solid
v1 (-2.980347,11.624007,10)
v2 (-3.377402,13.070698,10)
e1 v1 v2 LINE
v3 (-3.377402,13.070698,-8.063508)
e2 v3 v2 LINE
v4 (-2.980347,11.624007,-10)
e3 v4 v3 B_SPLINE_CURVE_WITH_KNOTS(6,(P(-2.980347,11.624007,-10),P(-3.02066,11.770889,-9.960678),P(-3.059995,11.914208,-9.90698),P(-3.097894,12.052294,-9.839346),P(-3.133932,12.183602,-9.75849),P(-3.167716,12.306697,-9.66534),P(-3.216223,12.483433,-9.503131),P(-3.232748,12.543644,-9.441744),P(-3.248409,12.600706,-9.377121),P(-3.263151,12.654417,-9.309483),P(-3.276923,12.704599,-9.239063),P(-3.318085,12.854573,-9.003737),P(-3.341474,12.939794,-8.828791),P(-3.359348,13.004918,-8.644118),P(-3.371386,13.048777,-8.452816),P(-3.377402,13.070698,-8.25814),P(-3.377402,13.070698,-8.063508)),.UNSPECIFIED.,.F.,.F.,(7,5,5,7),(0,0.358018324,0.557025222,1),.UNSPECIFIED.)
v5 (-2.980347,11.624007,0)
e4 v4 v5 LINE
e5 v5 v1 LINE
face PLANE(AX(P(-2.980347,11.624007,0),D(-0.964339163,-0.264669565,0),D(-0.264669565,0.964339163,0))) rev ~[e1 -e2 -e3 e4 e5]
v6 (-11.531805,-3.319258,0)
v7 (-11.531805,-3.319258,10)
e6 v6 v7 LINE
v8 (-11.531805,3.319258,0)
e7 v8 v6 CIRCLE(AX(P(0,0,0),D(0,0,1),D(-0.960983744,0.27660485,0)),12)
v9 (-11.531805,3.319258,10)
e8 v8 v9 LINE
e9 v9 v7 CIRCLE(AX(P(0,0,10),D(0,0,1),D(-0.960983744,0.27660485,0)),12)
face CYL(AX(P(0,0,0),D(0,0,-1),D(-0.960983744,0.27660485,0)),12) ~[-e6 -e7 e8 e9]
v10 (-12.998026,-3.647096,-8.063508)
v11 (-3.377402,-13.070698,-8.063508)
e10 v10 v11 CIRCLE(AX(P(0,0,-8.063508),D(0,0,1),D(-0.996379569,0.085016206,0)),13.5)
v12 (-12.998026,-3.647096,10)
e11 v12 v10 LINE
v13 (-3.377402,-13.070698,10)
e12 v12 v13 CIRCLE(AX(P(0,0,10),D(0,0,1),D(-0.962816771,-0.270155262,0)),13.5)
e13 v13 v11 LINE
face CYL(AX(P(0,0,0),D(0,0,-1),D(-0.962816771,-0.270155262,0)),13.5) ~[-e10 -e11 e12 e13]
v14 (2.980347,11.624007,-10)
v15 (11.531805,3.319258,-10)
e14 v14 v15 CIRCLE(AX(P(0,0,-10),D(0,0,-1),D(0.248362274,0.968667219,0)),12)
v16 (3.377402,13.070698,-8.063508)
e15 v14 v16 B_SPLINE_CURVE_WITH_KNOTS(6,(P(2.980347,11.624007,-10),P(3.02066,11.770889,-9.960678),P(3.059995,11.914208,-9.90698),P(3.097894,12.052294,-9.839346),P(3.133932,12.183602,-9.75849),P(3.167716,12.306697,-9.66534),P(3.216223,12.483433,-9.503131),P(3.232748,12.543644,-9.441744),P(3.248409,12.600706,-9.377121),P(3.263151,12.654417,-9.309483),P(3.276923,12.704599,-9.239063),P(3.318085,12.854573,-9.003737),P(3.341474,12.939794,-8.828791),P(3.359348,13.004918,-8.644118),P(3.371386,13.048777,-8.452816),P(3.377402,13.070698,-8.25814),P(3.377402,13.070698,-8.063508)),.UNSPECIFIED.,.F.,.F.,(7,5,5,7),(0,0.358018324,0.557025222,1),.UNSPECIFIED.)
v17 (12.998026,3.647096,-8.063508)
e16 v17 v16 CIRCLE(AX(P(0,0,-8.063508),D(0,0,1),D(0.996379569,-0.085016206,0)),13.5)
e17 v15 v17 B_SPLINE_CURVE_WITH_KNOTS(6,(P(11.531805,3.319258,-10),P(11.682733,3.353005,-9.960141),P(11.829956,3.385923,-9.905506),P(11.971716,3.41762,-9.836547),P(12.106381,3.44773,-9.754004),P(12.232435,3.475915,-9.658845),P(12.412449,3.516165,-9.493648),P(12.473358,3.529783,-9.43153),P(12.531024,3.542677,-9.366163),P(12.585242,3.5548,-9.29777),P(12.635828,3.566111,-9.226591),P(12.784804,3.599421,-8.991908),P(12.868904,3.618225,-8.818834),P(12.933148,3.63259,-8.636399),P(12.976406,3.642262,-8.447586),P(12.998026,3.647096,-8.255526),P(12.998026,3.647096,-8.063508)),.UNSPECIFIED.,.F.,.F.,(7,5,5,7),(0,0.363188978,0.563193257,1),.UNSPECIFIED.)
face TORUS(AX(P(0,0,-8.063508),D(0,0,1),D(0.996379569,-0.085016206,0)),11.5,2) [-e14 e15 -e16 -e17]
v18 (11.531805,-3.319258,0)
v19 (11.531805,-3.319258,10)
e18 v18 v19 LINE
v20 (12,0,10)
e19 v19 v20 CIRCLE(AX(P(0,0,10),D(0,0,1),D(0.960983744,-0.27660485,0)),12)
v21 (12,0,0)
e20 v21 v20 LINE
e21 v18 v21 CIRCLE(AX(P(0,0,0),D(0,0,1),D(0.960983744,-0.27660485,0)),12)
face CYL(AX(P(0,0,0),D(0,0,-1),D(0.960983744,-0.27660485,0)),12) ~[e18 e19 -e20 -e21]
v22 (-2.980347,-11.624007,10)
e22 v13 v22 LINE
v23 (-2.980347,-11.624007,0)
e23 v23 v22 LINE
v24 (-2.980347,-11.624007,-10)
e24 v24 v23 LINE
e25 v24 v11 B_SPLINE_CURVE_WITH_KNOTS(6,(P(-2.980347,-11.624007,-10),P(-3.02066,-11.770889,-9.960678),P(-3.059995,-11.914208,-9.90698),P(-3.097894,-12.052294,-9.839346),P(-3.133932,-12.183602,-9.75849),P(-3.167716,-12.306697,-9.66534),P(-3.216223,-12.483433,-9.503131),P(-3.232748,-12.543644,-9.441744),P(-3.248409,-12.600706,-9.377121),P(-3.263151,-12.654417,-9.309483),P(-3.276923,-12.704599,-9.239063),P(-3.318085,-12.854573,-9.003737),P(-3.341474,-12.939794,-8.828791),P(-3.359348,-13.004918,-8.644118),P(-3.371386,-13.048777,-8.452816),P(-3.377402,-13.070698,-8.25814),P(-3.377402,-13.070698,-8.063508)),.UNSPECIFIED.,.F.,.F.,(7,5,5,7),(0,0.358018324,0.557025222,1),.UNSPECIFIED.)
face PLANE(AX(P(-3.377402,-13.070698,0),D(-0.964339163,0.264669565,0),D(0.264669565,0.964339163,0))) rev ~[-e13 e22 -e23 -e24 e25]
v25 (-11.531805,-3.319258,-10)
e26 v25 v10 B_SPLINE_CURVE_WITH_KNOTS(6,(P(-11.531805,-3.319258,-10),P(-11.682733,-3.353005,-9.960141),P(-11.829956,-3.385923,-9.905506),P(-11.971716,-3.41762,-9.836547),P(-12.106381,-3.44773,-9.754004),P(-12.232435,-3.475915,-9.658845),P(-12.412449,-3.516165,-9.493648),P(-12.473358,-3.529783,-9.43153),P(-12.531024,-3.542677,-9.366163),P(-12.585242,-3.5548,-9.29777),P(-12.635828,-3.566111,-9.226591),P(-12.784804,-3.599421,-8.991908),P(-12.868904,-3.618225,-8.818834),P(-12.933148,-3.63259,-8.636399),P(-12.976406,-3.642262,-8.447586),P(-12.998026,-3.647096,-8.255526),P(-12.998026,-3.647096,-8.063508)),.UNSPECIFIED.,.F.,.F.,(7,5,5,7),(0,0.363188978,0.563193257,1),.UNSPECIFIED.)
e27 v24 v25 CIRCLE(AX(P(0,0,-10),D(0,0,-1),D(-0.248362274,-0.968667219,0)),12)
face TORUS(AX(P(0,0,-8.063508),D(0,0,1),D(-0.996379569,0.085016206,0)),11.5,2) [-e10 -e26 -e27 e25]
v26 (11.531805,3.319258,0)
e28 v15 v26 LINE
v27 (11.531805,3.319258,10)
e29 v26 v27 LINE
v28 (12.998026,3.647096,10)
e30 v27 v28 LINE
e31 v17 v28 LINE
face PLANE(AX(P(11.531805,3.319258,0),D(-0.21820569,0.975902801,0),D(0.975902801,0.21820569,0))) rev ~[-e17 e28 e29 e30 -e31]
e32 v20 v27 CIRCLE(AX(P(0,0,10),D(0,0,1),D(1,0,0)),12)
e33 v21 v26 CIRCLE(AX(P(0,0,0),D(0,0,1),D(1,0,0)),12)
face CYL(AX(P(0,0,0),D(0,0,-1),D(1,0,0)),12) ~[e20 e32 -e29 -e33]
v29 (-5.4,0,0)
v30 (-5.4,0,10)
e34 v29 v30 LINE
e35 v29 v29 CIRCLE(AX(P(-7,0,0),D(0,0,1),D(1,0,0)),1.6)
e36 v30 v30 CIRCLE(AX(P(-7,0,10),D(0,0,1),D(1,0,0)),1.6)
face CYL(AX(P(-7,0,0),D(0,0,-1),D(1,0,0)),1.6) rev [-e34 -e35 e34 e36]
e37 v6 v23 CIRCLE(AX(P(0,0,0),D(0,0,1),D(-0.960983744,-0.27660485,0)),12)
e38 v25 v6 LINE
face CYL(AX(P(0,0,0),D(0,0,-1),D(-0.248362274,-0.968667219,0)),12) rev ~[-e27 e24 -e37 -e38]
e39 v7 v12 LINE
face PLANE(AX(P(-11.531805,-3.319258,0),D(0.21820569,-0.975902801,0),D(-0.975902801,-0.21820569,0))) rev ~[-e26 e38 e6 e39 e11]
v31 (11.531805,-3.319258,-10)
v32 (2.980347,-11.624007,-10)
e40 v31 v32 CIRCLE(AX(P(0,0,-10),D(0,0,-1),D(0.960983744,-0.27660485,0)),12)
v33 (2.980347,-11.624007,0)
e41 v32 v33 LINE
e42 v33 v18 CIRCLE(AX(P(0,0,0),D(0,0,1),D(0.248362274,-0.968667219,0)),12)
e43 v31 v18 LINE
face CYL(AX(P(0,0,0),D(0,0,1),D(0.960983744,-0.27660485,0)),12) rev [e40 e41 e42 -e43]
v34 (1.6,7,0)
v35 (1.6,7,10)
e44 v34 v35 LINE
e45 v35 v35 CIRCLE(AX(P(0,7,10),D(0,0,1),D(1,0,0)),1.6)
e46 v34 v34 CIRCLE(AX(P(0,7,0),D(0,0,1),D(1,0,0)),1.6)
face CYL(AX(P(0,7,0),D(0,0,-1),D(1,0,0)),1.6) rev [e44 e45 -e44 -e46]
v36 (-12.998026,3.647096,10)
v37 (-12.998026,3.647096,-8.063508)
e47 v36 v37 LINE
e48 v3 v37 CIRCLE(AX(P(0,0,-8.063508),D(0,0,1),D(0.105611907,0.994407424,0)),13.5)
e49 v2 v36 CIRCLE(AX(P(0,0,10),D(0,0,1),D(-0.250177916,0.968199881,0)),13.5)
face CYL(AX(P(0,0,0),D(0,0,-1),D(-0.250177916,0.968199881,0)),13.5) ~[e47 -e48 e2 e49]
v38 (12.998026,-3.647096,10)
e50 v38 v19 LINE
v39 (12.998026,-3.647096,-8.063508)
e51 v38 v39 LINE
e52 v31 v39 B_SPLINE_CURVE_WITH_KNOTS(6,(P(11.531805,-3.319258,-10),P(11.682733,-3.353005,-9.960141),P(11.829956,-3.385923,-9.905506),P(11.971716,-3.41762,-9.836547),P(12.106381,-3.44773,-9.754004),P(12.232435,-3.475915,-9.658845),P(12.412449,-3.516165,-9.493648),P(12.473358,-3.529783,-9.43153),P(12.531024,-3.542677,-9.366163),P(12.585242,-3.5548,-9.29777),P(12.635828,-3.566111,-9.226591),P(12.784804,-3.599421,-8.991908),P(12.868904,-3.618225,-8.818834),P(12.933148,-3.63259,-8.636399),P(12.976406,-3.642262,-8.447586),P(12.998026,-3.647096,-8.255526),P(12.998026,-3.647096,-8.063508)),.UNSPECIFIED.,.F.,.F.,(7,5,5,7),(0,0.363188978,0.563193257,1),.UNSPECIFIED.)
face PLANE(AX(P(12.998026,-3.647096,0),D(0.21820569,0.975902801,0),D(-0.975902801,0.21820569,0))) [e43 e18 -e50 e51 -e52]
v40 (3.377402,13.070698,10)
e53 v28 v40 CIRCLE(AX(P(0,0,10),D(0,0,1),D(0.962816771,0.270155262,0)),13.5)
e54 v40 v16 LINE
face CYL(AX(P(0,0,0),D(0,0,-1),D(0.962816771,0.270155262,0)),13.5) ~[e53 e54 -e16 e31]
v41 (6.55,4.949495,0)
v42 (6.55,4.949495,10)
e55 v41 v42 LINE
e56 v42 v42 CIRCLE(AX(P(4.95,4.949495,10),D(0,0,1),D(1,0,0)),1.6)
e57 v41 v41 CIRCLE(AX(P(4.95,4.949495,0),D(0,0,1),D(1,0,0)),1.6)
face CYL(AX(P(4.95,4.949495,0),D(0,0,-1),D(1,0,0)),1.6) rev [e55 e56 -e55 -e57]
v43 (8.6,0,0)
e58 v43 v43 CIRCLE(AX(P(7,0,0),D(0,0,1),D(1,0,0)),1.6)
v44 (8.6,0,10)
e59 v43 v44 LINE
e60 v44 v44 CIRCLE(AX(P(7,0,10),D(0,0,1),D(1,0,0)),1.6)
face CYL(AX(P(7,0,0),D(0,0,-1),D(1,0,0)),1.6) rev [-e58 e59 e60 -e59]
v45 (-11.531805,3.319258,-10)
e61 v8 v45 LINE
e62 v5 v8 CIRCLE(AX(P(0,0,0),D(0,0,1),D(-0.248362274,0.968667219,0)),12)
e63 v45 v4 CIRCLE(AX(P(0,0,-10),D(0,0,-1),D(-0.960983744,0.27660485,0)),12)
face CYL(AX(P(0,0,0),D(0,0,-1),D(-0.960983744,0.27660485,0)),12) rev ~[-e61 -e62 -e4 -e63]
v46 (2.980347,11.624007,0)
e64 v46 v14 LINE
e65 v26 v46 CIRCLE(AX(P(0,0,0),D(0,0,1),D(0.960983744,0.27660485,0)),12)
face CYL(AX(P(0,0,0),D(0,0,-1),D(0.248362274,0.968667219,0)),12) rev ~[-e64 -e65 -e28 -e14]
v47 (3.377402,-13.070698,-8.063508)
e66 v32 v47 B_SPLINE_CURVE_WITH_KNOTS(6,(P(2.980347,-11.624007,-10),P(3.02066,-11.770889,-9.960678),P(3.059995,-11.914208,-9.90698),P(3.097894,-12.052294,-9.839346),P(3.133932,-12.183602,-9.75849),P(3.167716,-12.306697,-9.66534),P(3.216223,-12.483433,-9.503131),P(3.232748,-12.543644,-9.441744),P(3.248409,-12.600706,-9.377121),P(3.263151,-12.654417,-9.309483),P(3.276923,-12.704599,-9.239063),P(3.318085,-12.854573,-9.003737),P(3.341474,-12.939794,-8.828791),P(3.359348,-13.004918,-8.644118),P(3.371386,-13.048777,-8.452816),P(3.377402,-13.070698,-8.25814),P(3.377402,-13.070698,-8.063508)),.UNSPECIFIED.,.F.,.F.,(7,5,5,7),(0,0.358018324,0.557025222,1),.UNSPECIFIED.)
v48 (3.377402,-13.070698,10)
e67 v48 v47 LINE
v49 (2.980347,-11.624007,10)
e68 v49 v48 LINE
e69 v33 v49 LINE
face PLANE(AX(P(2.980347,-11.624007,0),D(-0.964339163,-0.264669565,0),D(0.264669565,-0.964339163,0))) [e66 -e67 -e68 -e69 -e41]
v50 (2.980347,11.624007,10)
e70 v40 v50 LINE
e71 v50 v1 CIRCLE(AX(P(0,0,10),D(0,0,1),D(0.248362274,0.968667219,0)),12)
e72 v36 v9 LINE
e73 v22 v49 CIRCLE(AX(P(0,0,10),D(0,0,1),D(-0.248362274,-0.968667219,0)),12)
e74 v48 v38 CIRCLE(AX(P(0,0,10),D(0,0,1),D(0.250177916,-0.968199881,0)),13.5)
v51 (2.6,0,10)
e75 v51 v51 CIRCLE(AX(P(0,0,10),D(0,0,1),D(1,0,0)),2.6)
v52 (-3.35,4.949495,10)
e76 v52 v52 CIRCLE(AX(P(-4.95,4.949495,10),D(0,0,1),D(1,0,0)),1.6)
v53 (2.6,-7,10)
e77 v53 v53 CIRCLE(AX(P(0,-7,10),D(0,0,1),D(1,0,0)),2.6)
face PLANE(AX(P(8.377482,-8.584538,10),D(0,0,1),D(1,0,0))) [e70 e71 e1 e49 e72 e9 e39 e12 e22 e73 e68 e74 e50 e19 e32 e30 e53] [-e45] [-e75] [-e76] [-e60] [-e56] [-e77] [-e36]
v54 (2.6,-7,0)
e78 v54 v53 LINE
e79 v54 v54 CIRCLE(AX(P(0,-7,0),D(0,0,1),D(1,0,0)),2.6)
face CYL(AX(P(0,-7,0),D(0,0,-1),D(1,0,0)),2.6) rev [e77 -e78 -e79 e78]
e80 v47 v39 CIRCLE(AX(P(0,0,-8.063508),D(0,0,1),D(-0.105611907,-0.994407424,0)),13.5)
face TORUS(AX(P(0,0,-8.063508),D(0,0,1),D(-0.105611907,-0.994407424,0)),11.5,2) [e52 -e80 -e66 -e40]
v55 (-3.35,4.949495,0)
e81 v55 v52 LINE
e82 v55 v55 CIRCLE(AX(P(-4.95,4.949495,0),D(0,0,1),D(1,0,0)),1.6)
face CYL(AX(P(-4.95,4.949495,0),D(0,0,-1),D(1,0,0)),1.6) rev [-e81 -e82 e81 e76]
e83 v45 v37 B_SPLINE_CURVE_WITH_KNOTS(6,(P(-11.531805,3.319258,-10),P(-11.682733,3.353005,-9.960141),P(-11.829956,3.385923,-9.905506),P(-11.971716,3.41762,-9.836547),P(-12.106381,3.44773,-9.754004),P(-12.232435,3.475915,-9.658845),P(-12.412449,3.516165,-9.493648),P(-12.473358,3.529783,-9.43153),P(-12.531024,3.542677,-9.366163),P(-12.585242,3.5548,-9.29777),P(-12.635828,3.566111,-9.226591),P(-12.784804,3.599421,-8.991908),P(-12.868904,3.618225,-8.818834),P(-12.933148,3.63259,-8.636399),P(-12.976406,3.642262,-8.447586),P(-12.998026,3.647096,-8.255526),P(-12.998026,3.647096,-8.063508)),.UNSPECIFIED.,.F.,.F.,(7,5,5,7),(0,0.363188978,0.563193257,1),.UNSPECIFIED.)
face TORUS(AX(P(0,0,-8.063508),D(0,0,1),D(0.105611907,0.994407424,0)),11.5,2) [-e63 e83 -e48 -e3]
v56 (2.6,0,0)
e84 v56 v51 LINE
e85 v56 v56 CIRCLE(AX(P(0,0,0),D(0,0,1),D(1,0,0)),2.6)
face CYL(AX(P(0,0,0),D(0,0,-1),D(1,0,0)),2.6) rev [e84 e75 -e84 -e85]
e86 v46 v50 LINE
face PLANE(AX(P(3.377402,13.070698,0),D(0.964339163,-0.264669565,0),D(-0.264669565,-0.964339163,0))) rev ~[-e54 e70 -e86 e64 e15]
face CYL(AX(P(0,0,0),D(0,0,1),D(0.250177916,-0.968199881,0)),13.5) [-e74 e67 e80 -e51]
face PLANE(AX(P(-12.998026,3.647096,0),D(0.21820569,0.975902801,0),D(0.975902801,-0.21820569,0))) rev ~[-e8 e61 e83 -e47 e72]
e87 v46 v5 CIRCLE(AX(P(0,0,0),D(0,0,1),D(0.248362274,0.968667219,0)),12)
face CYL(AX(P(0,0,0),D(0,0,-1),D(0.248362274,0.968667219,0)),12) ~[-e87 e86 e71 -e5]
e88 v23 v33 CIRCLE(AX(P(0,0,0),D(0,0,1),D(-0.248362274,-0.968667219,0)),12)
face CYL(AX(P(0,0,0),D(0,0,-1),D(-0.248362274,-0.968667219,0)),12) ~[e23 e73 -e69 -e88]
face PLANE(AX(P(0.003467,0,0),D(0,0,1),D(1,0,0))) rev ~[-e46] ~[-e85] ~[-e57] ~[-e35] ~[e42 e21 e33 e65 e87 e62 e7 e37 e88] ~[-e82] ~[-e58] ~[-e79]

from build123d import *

# Parameters (mm, degrees)
F0_R        = 4.25
F0_R_2      = 2.6
F1_DEPTH    = 10
F0_R_3      = 10.25
F0_R_4      = 1.6
F2_DEPTH    = 10
F3_DEPTH    = 10
F4_DEPTH    = 10
F5_T2_ANGLE = 100.939379093
F5_T4_ANGLE = 100.939379093
F5_T6_ANGLE = 100.939379093
F5_T8_ANGLE = 100.939379093


# Not quite as in the source:
# - a fillet or chamfer that OpenCascade refuses, or shapes differently, is made with other operations: its cross-section is extruded or revolved along the edge and cut away or added


with BuildPart() as f1:
    # F0 (on Top) → F1 (new body)
    with BuildSketch(Plane.XY):
        Circle(F0_R)
        Circle(F0_R_2, mode=Mode.SUBTRACT)
    extrude(amount=F1_DEPTH)

    # F0 (on Top) → F2 (join)
    with BuildSketch(Plane.XY):
        Circle(F0_R_3)
        with Locations((0, -7)):
            Circle(F0_R_2, mode=Mode.SUBTRACT)
        with Locations((-7, 0)):
            Circle(F0_R_4, mode=Mode.SUBTRACT)
        with Locations((-4.95, 4.9494949237)):
            Circle(F0_R_4, mode=Mode.SUBTRACT)
        Circle(F0_R, mode=Mode.SUBTRACT)
        with Locations((4.95, 4.9494949237)):
            Circle(F0_R_4, mode=Mode.SUBTRACT)
        with Locations((7, 0)):
            Circle(F0_R_4, mode=Mode.SUBTRACT)
        with Locations((0, 7)):
            Circle(F0_R_4, mode=Mode.SUBTRACT)
    extrude(amount=F2_DEPTH)

    # F0 (on Top) → F3 (join)
    with BuildSketch(Plane.XY):
        with BuildLine():
            ThreePointArc((11.5318049333, -3.3192581973), (11.8823747458, -1.6760579943), (12, 0))
            ThreePointArc((12, 0), (11.8823747458, 1.6760579943), (11.5318049333, 3.3192581973))
            ThreePointArc((11.5318049333, 3.3192581973), (8.3601945025, 8.6085508583), (2.9803472847, 11.6240066269))
            ThreePointArc((2.9803472847, 11.6240066269), (0, 12), (-2.9803472847, 11.6240066269))
            ThreePointArc((-2.9803472847, 11.6240066269), (-8.3601945025, 8.6085508583), (-11.5318049333, 3.3192581973))
            ThreePointArc((-11.5318049333, 3.3192581973), (-12, 0), (-11.5318049333, -3.3192581973))
            ThreePointArc((-11.5318049333, -3.3192581973), (-8.3601945025, -8.6085508583), (-2.9803472847, -11.6240066269))
            ThreePointArc((-2.9803472847, -11.6240066269), (0, -12), (2.9803472847, -11.6240066269))
            ThreePointArc((2.9803472847, -11.6240066269), (8.3601945025, -8.6085508583), (11.5318049333, -3.3192581973))
        make_face()
        Circle(F0_R_3, mode=Mode.SUBTRACT)
    extrude(amount=F3_DEPTH)

    # F0 (on Top) → F4 (join, symmetric)
    with BuildSketch(Plane.XY):
        with BuildLine():
            ThreePointArc((2.9803472847, 11.6240066269), (8.3601945025, 8.6085508583), (11.5318049333, 3.3192581973))
            Line((11.5318049333, 3.3192581973), (12.9980264072, 3.6470960391))
            ThreePointArc((12.9980264072, 3.6470960391), (9.4466784184, 9.6441830582), (3.3774018659, 13.070698399))
            Line((3.3774018659, 13.070698399), (2.9803472847, 11.6240066269))
        make_face()
        with BuildLine():
            ThreePointArc((-11.5318049333, 3.3192581973), (-8.3601945025, 8.6085508583), (-2.9803472847, 11.6240066269))
            Line((-2.9803472847, 11.6240066269), (-3.3774018659, 13.070698399))
            ThreePointArc((-3.3774018659, 13.070698399), (-9.4466784184, 9.6441830582), (-12.9980264072, 3.6470960391))
            Line((-12.9980264072, 3.6470960391), (-11.5318049333, 3.3192581973))
        make_face()
        with BuildLine():
            Line((-3.3774018659, -13.070698399), (-2.9803472847, -11.6240066269))
            ThreePointArc((-2.9803472847, -11.6240066269), (-8.3601945025, -8.6085508583), (-11.5318049333, -3.3192581973))
            Line((-11.5318049333, -3.3192581973), (-12.9980264072, -3.6470960391))
            ThreePointArc((-12.9980264072, -3.6470960391), (-9.4466784184, -9.6441830582), (-3.3774018659, -13.070698399))
        make_face()
        with BuildLine():
            Line((12.9980264072, -3.6470960391), (11.5318049333, -3.3192581973))
            ThreePointArc((11.5318049333, -3.3192581973), (8.3601945025, -8.6085508583), (2.9803472847, -11.6240066269))
            Line((2.9803472847, -11.6240066269), (3.3774018659, -13.070698399))
            ThreePointArc((3.3774018659, -13.070698399), (9.4466784184, -9.6441830582), (12.9980264072, -3.6470960391))
        make_face()
    extrude(amount=F4_DEPTH, both=True)

    # F5: fillet of radius 2 on 4 edges, made by hand

    # F5_s1 → F5_t2 (revolve, cut)
    with BuildSketch(Plane(origin=(0, 0, 0), x_dir=(0, 0, 1), z_dir=(-0.0850162065, -0.9963795686, 0))):
        with BuildLine():
            ThreePointArc((-10, -12), (-9.2882531983, -13.0811388301), (-8.0635083269, -13.5))
            Line((-8.0635083269, -13.5), (-10, -13.5))
            Line((-10, -13.5), (-10, -12))
        make_face()
    revolve(axis=Axis((0, 0, -10), (0, 0, 1)), revolution_arc=F5_T2_ANGLE, mode=Mode.SUBTRACT)

    # F5_s3 → F5_t4 (revolve, cut)
    with BuildSketch(Plane(origin=(0, 0, 0), x_dir=(0, 0, 1), z_dir=(0.9944074241, -0.1056119072, 0))):
        with BuildLine():
            ThreePointArc((-10, -12), (-9.2882531983, -13.0811388301), (-8.0635083269, -13.5))
            Line((-8.0635083269, -13.5), (-10, -13.5))
            Line((-10, -13.5), (-10, -12))
        make_face()
    revolve(axis=Axis((0, 0, -10), (0, 0, 1)), revolution_arc=F5_T4_ANGLE, mode=Mode.SUBTRACT)

    # F5_s5 → F5_t6 (revolve, cut)
    with BuildSketch(Plane(origin=(0, 0, 0), x_dir=(0, 0, 1), z_dir=(0.0850162065, 0.9963795686, 0))):
        with BuildLine():
            ThreePointArc((-10, -12), (-9.2882531983, -13.0811388301), (-8.0635083269, -13.5))
            Line((-8.0635083269, -13.5), (-10, -13.5))
            Line((-10, -13.5), (-10, -12))
        make_face()
    revolve(axis=Axis((0, 0, -10), (0, 0, 1)), revolution_arc=F5_T6_ANGLE, mode=Mode.SUBTRACT)

    # F5_s7 → F5_t8 (revolve, cut)
    with BuildSketch(Plane(origin=(0, 0, 0), x_dir=(0, 0, 1), z_dir=(-0.9944074241, 0.1056119072, 0))):
        with BuildLine():
            ThreePointArc((-10, -12), (-9.2882531983, -13.0811388301), (-8.0635083269, -13.5))
            Line((-8.0635083269, -13.5), (-10, -13.5))
            Line((-10, -13.5), (-10, -12))
        make_face()
    revolve(axis=Axis((0, 0, -10), (0, 0, 1)), revolution_arc=F5_T8_ANGLE, mode=Mode.SUBTRACT)


solid = f1.part
